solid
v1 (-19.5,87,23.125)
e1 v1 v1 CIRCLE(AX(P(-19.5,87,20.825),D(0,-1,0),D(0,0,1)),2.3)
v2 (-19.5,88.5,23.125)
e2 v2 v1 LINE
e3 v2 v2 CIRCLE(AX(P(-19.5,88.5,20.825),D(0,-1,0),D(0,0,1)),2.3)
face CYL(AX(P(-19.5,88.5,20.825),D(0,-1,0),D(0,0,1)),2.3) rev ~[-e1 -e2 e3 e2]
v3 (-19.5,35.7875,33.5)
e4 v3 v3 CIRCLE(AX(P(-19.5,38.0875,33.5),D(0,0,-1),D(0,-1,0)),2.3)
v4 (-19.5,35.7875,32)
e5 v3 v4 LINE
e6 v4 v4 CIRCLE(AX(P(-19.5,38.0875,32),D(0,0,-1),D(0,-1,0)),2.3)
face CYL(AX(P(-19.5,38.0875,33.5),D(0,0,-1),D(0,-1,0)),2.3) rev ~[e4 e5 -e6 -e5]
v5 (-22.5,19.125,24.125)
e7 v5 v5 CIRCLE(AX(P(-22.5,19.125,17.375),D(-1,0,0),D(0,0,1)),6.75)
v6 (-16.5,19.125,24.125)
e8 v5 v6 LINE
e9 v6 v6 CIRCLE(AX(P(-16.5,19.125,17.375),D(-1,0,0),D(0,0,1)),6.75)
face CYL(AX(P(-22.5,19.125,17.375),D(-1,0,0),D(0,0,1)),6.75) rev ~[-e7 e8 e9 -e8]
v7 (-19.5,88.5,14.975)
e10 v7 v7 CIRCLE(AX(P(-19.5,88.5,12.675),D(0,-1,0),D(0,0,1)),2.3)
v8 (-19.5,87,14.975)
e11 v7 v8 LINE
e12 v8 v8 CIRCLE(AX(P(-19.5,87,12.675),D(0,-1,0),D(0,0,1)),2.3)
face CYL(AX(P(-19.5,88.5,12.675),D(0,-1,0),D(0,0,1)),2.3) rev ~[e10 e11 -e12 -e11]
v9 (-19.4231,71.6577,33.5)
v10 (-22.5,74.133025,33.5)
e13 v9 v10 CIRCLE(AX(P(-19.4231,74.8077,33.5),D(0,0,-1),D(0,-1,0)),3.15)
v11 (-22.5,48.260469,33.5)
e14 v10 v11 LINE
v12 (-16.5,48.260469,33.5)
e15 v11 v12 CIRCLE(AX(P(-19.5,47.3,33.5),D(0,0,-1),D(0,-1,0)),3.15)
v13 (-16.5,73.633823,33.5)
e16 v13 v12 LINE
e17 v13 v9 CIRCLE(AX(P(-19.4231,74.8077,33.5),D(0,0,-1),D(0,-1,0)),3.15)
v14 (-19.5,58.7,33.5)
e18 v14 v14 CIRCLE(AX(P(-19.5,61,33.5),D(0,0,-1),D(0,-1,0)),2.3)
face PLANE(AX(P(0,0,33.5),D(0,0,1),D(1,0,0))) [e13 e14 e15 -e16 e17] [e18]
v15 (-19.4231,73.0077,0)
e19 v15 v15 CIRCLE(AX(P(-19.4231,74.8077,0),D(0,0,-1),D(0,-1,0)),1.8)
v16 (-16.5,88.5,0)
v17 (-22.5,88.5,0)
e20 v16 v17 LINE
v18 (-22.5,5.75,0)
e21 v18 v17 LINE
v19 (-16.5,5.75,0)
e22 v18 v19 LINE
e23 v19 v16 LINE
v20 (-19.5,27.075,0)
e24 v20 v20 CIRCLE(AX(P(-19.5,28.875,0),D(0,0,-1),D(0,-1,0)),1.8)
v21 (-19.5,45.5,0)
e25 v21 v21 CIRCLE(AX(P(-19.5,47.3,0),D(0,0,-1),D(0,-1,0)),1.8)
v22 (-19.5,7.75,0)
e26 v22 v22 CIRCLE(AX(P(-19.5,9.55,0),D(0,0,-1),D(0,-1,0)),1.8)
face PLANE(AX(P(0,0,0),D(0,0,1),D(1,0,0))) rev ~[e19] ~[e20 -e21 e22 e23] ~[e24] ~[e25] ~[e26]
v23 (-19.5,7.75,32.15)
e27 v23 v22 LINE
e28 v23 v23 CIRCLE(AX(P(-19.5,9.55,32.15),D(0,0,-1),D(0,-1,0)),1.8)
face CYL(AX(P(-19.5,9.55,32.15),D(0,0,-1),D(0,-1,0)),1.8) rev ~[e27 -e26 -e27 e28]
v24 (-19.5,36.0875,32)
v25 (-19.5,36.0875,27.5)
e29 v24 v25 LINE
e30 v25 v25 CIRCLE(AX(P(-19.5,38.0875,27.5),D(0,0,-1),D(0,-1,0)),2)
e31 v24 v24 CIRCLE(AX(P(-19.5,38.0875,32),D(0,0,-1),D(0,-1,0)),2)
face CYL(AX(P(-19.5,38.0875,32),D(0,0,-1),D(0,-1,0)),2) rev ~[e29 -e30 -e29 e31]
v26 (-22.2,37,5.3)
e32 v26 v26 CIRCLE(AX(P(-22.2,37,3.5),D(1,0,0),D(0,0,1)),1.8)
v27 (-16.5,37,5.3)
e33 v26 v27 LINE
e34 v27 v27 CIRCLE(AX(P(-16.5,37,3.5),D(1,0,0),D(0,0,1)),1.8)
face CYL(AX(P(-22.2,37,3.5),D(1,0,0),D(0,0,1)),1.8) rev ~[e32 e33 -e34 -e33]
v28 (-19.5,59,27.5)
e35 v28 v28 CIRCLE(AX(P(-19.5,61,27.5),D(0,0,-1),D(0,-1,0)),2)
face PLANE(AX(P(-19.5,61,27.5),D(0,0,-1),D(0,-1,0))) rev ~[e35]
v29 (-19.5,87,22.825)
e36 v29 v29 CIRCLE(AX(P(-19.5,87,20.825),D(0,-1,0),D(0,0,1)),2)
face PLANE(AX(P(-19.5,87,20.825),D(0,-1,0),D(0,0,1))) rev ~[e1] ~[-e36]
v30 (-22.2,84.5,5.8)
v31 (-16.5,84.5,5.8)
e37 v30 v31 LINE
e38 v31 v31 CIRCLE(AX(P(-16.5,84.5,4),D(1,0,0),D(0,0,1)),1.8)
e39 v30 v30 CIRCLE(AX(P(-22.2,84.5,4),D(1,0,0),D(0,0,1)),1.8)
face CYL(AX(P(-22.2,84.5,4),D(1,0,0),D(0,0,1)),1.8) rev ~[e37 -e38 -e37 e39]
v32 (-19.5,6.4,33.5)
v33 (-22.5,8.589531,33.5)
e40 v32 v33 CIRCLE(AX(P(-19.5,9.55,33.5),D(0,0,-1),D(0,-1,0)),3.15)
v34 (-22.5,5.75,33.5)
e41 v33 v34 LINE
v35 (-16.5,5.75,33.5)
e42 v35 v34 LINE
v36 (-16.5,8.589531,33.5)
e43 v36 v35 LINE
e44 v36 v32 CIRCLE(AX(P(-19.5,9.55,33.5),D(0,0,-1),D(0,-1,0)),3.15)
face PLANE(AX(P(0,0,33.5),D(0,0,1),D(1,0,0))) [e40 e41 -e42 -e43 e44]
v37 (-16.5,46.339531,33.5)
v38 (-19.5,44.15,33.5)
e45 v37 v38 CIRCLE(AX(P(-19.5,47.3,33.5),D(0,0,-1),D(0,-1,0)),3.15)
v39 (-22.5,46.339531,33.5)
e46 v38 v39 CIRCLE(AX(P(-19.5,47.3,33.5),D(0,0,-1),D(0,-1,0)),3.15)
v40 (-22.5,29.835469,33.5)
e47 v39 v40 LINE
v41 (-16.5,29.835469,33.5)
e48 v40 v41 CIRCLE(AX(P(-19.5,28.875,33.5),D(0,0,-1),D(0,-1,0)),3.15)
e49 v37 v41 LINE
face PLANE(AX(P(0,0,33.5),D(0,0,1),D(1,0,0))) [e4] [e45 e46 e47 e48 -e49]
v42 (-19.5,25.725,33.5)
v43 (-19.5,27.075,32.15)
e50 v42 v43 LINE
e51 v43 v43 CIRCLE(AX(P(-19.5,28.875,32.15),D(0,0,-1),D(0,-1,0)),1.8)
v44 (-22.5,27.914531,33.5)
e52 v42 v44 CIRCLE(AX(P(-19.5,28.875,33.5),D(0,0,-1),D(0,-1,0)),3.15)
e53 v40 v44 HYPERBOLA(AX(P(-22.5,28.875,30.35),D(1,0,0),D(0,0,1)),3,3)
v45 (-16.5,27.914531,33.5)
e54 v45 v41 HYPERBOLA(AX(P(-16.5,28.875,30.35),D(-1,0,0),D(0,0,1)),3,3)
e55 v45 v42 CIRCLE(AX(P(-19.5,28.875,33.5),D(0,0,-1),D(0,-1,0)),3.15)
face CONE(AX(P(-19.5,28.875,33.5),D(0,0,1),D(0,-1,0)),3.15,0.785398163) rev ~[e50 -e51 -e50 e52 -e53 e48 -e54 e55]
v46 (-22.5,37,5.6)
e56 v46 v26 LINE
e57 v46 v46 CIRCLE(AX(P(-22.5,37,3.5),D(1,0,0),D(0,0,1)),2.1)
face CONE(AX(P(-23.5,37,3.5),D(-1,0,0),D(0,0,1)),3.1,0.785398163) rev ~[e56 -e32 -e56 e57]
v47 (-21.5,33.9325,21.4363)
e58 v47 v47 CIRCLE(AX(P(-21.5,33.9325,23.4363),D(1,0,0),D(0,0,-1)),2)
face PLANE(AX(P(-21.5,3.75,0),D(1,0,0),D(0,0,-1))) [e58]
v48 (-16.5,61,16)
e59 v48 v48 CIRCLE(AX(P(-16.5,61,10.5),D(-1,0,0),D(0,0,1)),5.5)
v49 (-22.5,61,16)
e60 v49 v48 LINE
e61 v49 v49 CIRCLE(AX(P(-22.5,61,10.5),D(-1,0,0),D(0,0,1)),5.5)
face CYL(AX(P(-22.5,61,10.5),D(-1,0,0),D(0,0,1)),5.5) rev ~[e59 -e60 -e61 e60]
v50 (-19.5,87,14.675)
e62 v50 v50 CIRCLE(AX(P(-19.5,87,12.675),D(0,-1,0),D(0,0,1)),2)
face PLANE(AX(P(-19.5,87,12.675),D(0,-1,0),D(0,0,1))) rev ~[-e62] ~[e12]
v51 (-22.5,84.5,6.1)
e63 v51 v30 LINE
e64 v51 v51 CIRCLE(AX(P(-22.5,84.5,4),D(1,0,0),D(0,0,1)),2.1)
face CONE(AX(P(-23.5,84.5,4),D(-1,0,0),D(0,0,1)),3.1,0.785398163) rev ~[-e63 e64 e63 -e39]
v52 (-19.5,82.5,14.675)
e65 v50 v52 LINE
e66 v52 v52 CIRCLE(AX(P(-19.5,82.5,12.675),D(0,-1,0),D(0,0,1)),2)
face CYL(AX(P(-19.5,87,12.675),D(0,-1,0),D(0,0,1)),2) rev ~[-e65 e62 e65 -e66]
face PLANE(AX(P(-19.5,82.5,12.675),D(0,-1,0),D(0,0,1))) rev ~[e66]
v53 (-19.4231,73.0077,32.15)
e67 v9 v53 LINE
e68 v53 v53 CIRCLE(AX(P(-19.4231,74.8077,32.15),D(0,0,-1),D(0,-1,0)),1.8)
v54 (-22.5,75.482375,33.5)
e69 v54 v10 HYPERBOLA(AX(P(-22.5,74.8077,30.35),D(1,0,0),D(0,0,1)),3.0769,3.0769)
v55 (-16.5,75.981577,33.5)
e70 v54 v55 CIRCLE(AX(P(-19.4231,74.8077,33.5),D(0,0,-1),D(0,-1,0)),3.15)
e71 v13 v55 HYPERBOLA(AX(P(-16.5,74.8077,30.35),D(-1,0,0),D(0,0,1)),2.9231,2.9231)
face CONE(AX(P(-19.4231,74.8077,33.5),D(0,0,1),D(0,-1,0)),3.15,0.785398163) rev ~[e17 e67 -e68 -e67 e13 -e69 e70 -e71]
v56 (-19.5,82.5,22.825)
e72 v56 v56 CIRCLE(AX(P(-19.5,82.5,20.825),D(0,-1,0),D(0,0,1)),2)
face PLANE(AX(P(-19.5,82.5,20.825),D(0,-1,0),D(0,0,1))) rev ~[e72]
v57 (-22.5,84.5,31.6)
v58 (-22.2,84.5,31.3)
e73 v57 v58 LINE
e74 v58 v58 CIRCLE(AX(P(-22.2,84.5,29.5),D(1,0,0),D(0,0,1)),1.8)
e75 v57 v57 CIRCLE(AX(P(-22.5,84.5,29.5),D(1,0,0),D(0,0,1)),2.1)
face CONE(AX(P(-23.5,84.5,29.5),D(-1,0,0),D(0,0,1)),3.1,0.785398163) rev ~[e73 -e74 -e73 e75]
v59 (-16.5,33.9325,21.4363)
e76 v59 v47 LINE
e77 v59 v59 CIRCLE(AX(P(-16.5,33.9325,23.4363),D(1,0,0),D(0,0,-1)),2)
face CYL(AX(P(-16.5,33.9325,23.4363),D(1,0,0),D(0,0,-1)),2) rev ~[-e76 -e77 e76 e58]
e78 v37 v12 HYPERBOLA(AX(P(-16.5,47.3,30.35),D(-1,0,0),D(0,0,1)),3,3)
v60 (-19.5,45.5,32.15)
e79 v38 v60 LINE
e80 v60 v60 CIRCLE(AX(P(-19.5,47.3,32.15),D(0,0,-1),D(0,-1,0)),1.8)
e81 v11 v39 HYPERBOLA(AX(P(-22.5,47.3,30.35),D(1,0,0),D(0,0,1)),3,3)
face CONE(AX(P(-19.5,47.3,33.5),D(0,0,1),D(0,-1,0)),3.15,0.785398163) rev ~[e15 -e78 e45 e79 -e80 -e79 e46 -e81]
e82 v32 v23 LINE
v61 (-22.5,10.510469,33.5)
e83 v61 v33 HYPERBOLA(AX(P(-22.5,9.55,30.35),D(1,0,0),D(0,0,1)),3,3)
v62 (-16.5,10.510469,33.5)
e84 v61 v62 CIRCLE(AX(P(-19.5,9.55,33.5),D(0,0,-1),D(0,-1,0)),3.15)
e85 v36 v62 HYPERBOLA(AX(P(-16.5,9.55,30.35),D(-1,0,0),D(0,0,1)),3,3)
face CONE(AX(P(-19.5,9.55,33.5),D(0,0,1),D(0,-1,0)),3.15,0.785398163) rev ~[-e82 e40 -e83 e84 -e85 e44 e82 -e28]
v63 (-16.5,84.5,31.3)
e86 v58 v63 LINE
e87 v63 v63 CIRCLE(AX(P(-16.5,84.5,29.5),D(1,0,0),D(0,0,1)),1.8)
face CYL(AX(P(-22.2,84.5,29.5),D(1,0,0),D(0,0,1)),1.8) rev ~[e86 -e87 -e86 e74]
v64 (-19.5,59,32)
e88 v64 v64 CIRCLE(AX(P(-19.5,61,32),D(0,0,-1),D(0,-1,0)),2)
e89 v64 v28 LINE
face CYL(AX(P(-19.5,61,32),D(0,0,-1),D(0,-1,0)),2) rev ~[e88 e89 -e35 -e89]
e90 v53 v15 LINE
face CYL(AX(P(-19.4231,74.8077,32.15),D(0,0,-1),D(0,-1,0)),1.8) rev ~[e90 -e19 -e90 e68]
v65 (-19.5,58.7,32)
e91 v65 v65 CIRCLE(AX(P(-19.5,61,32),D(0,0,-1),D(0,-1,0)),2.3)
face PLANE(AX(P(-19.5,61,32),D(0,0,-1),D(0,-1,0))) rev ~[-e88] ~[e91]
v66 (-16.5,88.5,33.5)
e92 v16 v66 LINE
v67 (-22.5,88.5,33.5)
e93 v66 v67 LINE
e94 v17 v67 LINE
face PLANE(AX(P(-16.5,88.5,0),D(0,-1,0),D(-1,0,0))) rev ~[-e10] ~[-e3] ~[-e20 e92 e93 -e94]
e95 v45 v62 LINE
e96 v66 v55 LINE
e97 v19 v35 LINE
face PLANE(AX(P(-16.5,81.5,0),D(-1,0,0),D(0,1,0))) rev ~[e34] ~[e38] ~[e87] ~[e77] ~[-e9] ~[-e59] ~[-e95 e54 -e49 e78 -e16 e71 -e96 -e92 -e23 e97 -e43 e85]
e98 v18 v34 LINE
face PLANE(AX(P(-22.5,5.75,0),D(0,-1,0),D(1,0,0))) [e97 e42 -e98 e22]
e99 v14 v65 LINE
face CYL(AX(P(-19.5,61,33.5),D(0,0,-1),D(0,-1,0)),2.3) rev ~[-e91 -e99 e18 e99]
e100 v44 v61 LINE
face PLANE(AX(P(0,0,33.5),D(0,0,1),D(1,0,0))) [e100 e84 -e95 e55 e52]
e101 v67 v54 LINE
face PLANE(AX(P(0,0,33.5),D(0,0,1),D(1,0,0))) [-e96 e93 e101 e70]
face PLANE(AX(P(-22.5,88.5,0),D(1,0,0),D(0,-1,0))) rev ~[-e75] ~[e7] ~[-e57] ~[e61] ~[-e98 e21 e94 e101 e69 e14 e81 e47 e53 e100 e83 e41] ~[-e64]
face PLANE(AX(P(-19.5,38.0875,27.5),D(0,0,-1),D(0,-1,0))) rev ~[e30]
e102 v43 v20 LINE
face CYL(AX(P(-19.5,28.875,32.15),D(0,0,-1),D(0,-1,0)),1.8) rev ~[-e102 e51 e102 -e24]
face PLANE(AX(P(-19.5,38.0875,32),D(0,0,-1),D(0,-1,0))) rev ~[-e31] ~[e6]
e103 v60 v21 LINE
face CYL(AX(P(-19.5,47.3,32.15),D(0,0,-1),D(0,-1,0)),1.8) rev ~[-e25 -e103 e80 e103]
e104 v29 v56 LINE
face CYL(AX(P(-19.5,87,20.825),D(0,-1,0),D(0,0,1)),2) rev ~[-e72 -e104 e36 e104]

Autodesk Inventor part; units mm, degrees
ref_plane "YZ Plane" through (0, 0, 0) normal (1, 0, 0) x (0, 1, 0)
ref_plane "XZ Plane" through (0, 0, 0) normal (0, 1, 0) x (-1, 0, 0)
ref_plane "Work Plane1" through (0, 0, 0) normal (0, 0, 1) x (1, 0, 0)
sketch "Sketch1" plane through (0, 0, 0) normal (0, 0, 1) x (1, 0, 0)
  line L0 (23.5, 88.5) -> (-23.5, 88.5) projected
  line L1 (-23.5, 88.5) -> (-23.5, 36.5) projected
  line L2 (-26.5, 33.5) -> (-89, 33.5) projected
  line L3 (-89, 33.5) -> (-89, -72.5) projected
  line L4 (-89, -72.5) -> (-77, -72.5) projected
  line L5 (-74, -75.5) -> (-74, -93.5) projected
  line L6 (-74, -93.5) -> (74, -93.5) projected
  line L7 (74, -93.5) -> (74, -75.5) projected
  line L8 (77, -72.5) -> (89, -72.5) projected
  line L9 (89, -72.5) -> (89, 33.5) projected
  line L10 (89, 33.5) -> (26.5, 33.5) projected
  line L11 (23.5, 36.5) -> (23.5, 88.5) projected
  line L12 (-4.5, 81.5) -> (-4.5, 36.5) projected
  line L13 (-7.5, 33.5) -> (-13.5, 33.5) projected
  line L14 (-16.5, 36.5) -> (-16.5, 81.5) projected
  line L15 (-13.5, 84.5) -> (-7.5, 84.5) projected
  line L16 (16.5, 81.5) -> (16.5, 36.5) projected
  line L17 (13.5, 33.5) -> (7.5, 33.5) projected
  line L18 (4.5, 36.5) -> (4.5, 81.5) projected
  line L19 (7.5, 84.5) -> (13.5, 84.5) projected
  line L20 (-16.5, 88.5) -> (-22.5, 88.5)
  line L21 (-22.5, 88.5) -> (-22.5, 3.75)
  line L22 (-22.5, 3.75) -> (-16.5, 3.75)
  line L23 (-16.5, 3.75) -> (-16.5, 88.5)
  line L24 (-32.2, 4.75) -> (-59.9, 4.75)
  arc A0 (13.5, 33.5) -> (16.5, 36.5) centre (13.5, 36.5) ccw projected
  arc A1 (4.5, 36.5) -> (7.5, 33.5) centre (7.5, 36.5) ccw projected
  arc A2 (7.5, 84.5) -> (4.5, 81.5) centre (7.5, 81.5) ccw projected
  arc A3 (16.5, 81.5) -> (13.5, 84.5) centre (13.5, 81.5) ccw projected
  arc A4 (-4.5, 81.5) -> (-7.5, 84.5) centre (-7.5, 81.5) ccw projected
  arc A5 (-7.5, 33.5) -> (-4.5, 36.5) centre (-7.5, 36.5) ccw projected
  arc A6 (-16.5, 36.5) -> (-13.5, 33.5) centre (-13.5, 36.5) ccw projected
  arc A7 (-13.5, 84.5) -> (-16.5, 81.5) centre (-13.5, 81.5) ccw projected
  arc A8 (-26.5, 33.5) -> (-23.5, 36.5) centre (-26.5, 36.5) ccw projected
  arc A9 (-74, -75.5) -> (-77, -72.5) centre (-77, -75.5) ccw projected
  arc A10 (77, -72.5) -> (74, -75.5) centre (77, -75.5) ccw projected
  arc A11 (23.5, 36.5) -> (26.5, 33.5) centre (26.5, 36.5) ccw projected
  circle A12 centre (39.125, 25.9125) radius 1.0065 projected
  circle A13 centre (72.95, 12.275) radius 1.0065 projected
  circle A14 centre (-39.125, 12.3375) radius 1.0065 projected
  circle A15 centre (-72.95, 25.975) radius 1.0065 projected
  circle A16 centre (-72.95, 12.275) radius 1.0065 projected
  circle A17 centre (-39.125, 25.9125) radius 1.0065 projected
  circle A18 centre (72.95, 25.975) radius 1.0065 projected
  circle A19 centre (39.125, 12.3375) radius 1.0065 projected
  circle A20 centre (-42.4984, -44.6666) radius 1.2295 projected
  circle A21 centre (-79, -42.3889) radius 1.2295 projected
  circle A22 centre (-19.5, 28.875) radius 1.2295 projected
  circle A23 centre (19.5, 9.55) radius 1.2295 projected
  circle A24 centre (19.5, 47.3) radius 1.2295 projected
  circle A25 centre (-19.5, 47.3) radius 1.2295 projected
  circle A26 centre (0, 74.7) radius 1.2295 projected
  circle A27 centre (-19.4231, 74.8077) radius 1.2295 projected
  circle A28 centre (19.5, 74.7) radius 1.2295 projected
  circle A29 centre (0, 49.05) radius 1.2295 projected
  circle A30 centre (19.5, 28.875) radius 1.2295 projected
  circle A31 centre (0, 19.125) radius 1.2295 projected
  circle A32 centre (-19.5, 9.55) radius 1.2295 projected
  circle A33 centre (42.5, -44.6649) radius 1.2295 projected
  circle A34 centre (79, -42.3889) radius 1.2295 projected
  circle A35 centre (21.5, -85.5) radius 1.8 projected
  circle A36 centre (-64.5, -85.5) radius 1.8 projected
  circle A37 centre (-21.5, -85.5) radius 1.8 projected
  circle A38 centre (64.5, -85.5) radius 1.8 projected
  line L25 (-58.2315, -77.6013) -> (-80.7685, -61.1541) projected
  line L26 (-82, -58.7308) -> (-82, -48.3889) projected
  line L27 (-75.8885, -45.3972) -> (-47.1423, -47.5438) projected
  line L28 (-21.1, -26.5751) -> (-21.1, -22.0813) projected
  line L29 (-46.9357, -41.5592) -> (-76, -39.3889) projected
  line L30 (-82, -36.3889) -> (-82, 1.75) projected
  line L31 (32.9914, 4.75) -> (79, 4.75) projected
  line L32 (82, -48.3889) -> (82, -58.7308) projected
  line L33 (76, -39.3889) -> (46.9371, -41.5577) projected
  line L34 (21.1, -22.0813) -> (21.1, -26.5749) projected
  line L35 (47.144, -47.5423) -> (76, -45.3889) projected
  line L36 (82, 1.75) -> (82, -36.3889) projected
  line L37 (80.7685, -61.1541) -> (58.2315, -77.6013) projected
  line L38 (57, -80.0246) -> (57, -87.5) projected
  arc A39 (55, -89.5) -> (57, -87.5) centre (55, -87.5) ccw projected
  line L39 (55, -89.5) -> (31, -89.5) projected
  arc A40 (29, -87.5) -> (31, -89.5) centre (31, -87.5) ccw projected
  line L40 (29, -87.5) -> (29, -79.2522) projected
  line L41 (14, -79.5039) -> (14, -87.5) projected
  arc A41 (12, -89.5) -> (14, -87.5) centre (12, -87.5) ccw projected
  line L42 (12, -89.5) -> (-12, -89.5) projected
  arc A42 (-14, -87.5) -> (-12, -89.5) centre (-12, -87.5) ccw projected
  line L43 (-14, -87.5) -> (-14, -79.5039) projected
  line L44 (-29, -79.2522) -> (-29, -87.5) projected
  arc A43 (-31, -89.5) -> (-29, -87.5) centre (-31, -87.5) ccw projected
  line L45 (-31, -89.5) -> (-55, -89.5) projected
  arc A44 (-57, -87.5) -> (-55, -89.5) centre (-55, -87.5) ccw projected
  line L46 (-57, -87.5) -> (-57, -80.0246) projected
  line L47 (-66.95, 28.9125) -> (-45.125, 28.9125) projected
  line L48 (-42.125, 25.9125) -> (-42.125, 12.275) projected
  line L49 (-45.125, 9.275) -> (-66.95, 9.275) projected
  line L50 (-69.95, 12.275) -> (-69.95, 25.9125) projected
  line L51 (-16.5, 12.75) -> (-16.5, 25.5) projected
  line L52 (-13.5, 28.5) -> (-7.5, 28.5) projected
  line L53 (-4.5, 25.5) -> (-4.5, 12.75) projected
  line L54 (-7.5, 9.75) -> (-13.5, 9.75) projected
  line L55 (66.95, 9.3375) -> (45.125, 9.3375) projected
  line L56 (42.125, 12.3375) -> (42.125, 25.975) projected
  line L57 (45.125, 28.975) -> (66.95, 28.975) projected
  line L58 (69.95, 25.975) -> (69.95, 12.3375) projected
  line L59 (4.5, 12.75) -> (4.5, 25.5) projected
  line L60 (7.5, 28.5) -> (13.5, 28.5) projected
  line L61 (16.5, 25.5) -> (16.5, 12.75) projected
  line L62 (13.5, 9.75) -> (7.5, 9.75) projected
  line L63 (44.5181, -40.6102) -> (28.0504, -22.9209) projected
  line L64 (27.268, -20.5154) -> (30.0132, 2.1113) projected
  line L65 (-44.7206, -49.1201) -> (-29.3549, -77.8368) projected
  line L66 (-79, 4.75) -> (-32.9914, 4.75) projected
  line L67 (-30.0132, 2.1113) -> (-27.268, -20.5155) projected
  line L68 (-28.0502, -22.9208) -> (-44.5164, -40.6115) projected
  line L69 (29.3549, -77.8368) -> (44.7222, -49.1185) projected
  line L70 (-14.6042, -77.6983) -> (-37.8537, -46.8489) projected
  line L71 (-37.4786, -42.8259) -> (-22.0793, -28.7924) projected
  line L72 (-21.1218, -21.72) -> (-23.9255, 1.3887) projected
  line L73 (-20.9474, 4.75) -> (20.9474, 4.75) projected
  line L74 (23.9255, 1.3887) -> (21.1218, -21.72) projected
  line L75 (22.0795, -28.7925) -> (37.4798, -42.8243) projected
  line L76 (37.8551, -46.8475) -> (14.6042, -77.6983) projected
  circle A45 centre (-78, -67.1725) radius 1.2295 projected
  arc A46 (79, -39.3889) -> (82, -36.3889) centre (79, -36.3889) ccw projected
  arc A47 (44.5181, -40.6102) -> (46.9371, -41.5577) centre (46.7138, -38.566) ccw projected
  arc A48 (27.268, -20.5154) -> (28.0504, -22.9209) centre (30.2461, -20.8767) ccw projected
  arc A49 (32.9914, 4.75) -> (30.0132, 2.1113) centre (32.9914, 1.75) ccw projected
  arc A50 (82, 1.75) -> (79, 4.75) centre (79, 1.75) ccw projected
  arc A51 (-42.125, 25.9125) -> (-45.125, 28.9125) centre (-45.125, 25.9125) ccw projected
  arc A52 (-45.125, 9.275) -> (-42.125, 12.275) centre (-45.125, 12.275) ccw projected
  arc A53 (-69.95, 12.275) -> (-66.95, 9.275) centre (-66.95, 12.275) ccw projected
  arc A54 (-66.95, 28.9125) -> (-69.95, 25.9125) centre (-66.95, 25.9125) ccw projected
  arc A55 (-13.5, 28.5) -> (-16.5, 25.5) centre (-13.5, 25.5) ccw projected
  arc A56 (-4.5, 25.5) -> (-7.5, 28.5) centre (-7.5, 25.5) ccw projected
  arc A57 (-7.5, 9.75) -> (-4.5, 12.75) centre (-7.5, 12.75) ccw projected
  arc A58 (-16.5, 12.75) -> (-13.5, 9.75) centre (-13.5, 12.75) ccw projected
  arc A59 (58.2315, -77.6013) -> (57, -80.0246) centre (60, -80.0246) ccw projected
  arc A60 (29.3549, -77.8368) -> (29, -79.2522) centre (32, -79.2522) ccw projected
  arc A61 (47.144, -47.5423) -> (44.7222, -49.1185) centre (47.3673, -50.5339) ccw projected
  arc A62 (82, -48.3889) -> (79, -45.3889) centre (79, -48.3889) ccw projected
  arc A63 (80.7685, -61.1541) -> (82, -58.7308) centre (79, -58.7308) ccw projected
  arc A64 (-21.1, -22.0813) -> (-21.1218, -21.72) centre (-24.1, -22.0813) ccw projected
  arc A65 (-20.9474, 4.75) -> (-23.9255, 1.3887) centre (-20.9474, 1.75) ccw projected
  arc A66 (23.9255, 1.3887) -> (20.9474, 4.75) centre (20.9474, 1.75) ccw projected
  arc A67 (21.1218, -21.72) -> (21.1, -22.0813) centre (24.1, -22.0813) ccw projected
  arc A68 (21.1, -26.5749) -> (22.0795, -28.7925) centre (24.1, -26.5749) ccw projected
  arc A69 (37.8551, -46.8475) -> (37.4798, -42.8243) centre (35.4593, -45.0419) ccw projected
  arc A70 (14.6042, -77.6983) -> (14, -79.5039) centre (17, -79.5039) ccw projected
  arc A71 (-14, -79.5039) -> (-14.6042, -77.6983) centre (-17, -79.5039) ccw projected
  arc A72 (-37.4786, -42.8259) -> (-37.8537, -46.8489) centre (-35.4579, -45.0433) ccw projected
  arc A73 (-22.0793, -28.7924) -> (-21.1, -26.5751) centre (-24.1, -26.5751) ccw projected
  arc A74 (-82, -36.3889) -> (-79, -39.3889) centre (-79, -36.3889) ccw projected
  arc A75 (-79, 4.75) -> (-82, 1.75) centre (-79, 1.75) ccw projected
  arc A76 (-30.0132, 2.1113) -> (-32.9914, 4.75) centre (-32.9914, 1.75) ccw projected
  arc A77 (-28.0502, -22.9208) -> (-27.268, -20.5155) centre (-30.2461, -20.8769) ccw projected
  arc A78 (-46.9357, -41.5592) -> (-44.5164, -40.6115) centre (-46.7123, -38.5676) ccw projected
  arc A79 (7.5, 28.5) -> (4.5, 25.5) centre (7.5, 25.5) ccw projected
  arc A80 (16.5, 25.5) -> (13.5, 28.5) centre (13.5, 25.5) ccw projected
  arc A81 (13.5, 9.75) -> (16.5, 12.75) centre (13.5, 12.75) ccw projected
  arc A82 (4.5, 12.75) -> (7.5, 9.75) centre (7.5, 12.75) ccw projected
  arc A83 (-57, -80.0246) -> (-58.2315, -77.6013) centre (-60, -80.0246) ccw projected
  arc A84 (-82, -58.7308) -> (-80.7685, -61.1541) centre (-79, -58.7308) ccw projected
  arc A85 (-75.8885, -45.3972) -> (-76.1119, -45.3889) centre (-76.1119, -48.3889) ccw projected
  arc A86 (-44.7206, -49.1201) -> (-47.1423, -47.5438) centre (-47.3657, -50.5355) ccw projected
  arc A87 (-29, -79.2522) -> (-29.3549, -77.8368) centre (-32, -79.2522) ccw projected
  arc A88 (42.125, 12.3375) -> (45.125, 9.3375) centre (45.125, 12.3375) ccw projected
  arc A89 (45.125, 28.975) -> (42.125, 25.975) centre (45.125, 25.975) ccw projected
  arc A90 (69.95, 25.975) -> (66.95, 28.975) centre (66.95, 25.975) ccw projected
  arc A91 (66.95, 9.3375) -> (69.95, 12.3375) centre (66.95, 12.3375) ccw projected
  circle A92 centre (78, -67.1725) radius 1.2295 projected
  line L77 (-22.5, 25.9125) -> (-22.5, 12.55) projected
  arc A93 (-25.5, 9.55) -> (-22.5, 12.55) centre (-25.5, 12.55) ccw projected
  line L78 (-25.5, 9.55) -> (-33.125, 9.55) projected
  arc A94 (-36.125, 12.55) -> (-33.125, 9.55) centre (-33.125, 12.55) ccw projected
  line L79 (-36.125, 12.55) -> (-36.125, 25.9125) projected
  arc A95 (-33.125, 28.9125) -> (-36.125, 25.9125) centre (-33.125, 25.9125) ccw projected
  line L80 (-33.125, 28.9125) -> (-25.5, 28.9125) projected
  arc A96 (-22.5, 25.9125) -> (-25.5, 28.9125) centre (-25.5, 25.9125) ccw projected
  line L81 (76, -45.3889) -> (79, -45.3889) projected
  line L82 (79, -39.3889) -> (76, -39.3889) projected
  line L83 (33.125, 9.275) -> (25.5, 9.275) projected
  arc A97 (22.5, 12.275) -> (25.5, 9.275) centre (25.5, 12.275) ccw projected
  line L84 (22.5, 12.275) -> (22.5, 25.9125) projected
  arc A98 (25.5, 28.9125) -> (22.5, 25.9125) centre (25.5, 25.9125) ccw projected
  line L85 (25.5, 28.9125) -> (33.125, 28.9125) projected
  arc A99 (36.125, 25.9125) -> (33.125, 28.9125) centre (33.125, 25.9125) ccw projected
  line L86 (36.125, 25.9125) -> (36.125, 12.275) projected
  arc A100 (33.125, 9.275) -> (36.125, 12.275) centre (33.125, 12.275) ccw projected
  line L87 (-83, 28.975) -> (-78.95, 28.975) projected
  arc A101 (-75.95, 25.975) -> (-78.95, 28.975) centre (-78.95, 25.975) ccw projected
  line L88 (-75.95, 25.975) -> (-75.95, 12.275) projected
  arc A102 (-78.95, 9.275) -> (-75.95, 12.275) centre (-78.95, 12.275) ccw projected
  line L89 (-78.95, 9.275) -> (-83, 9.275) projected
  arc A103 (-86, 12.275) -> (-83, 9.275) centre (-83, 12.275) ccw projected
  line L90 (-86, 12.275) -> (-86, 25.975) projected
  arc A104 (-83, 28.975) -> (-86, 25.975) centre (-83, 25.975) ccw projected
  arc A105 (-79, -45.3889) -> (-82, -48.3889) centre (-79, -48.3889) ccw projected
  line L91 (-79, -45.3889) -> (-76.1119, -45.3889) projected
  line L92 (-76, -39.3889) -> (-79, -39.3889) projected
  line L93 (78.95, 28.975) -> (83, 28.975) projected
  arc A106 (86, 25.975) -> (83, 28.975) centre (83, 25.975) ccw projected
  line L94 (86, 25.975) -> (86, 12.275) projected
  arc A107 (83, 9.275) -> (86, 12.275) centre (83, 12.275) ccw projected
  line L95 (83, 9.275) -> (78.95, 9.275) projected
  arc A108 (75.95, 12.275) -> (78.95, 9.275) centre (78.95, 12.275) ccw projected
  line L96 (75.95, 12.275) -> (75.95, 25.975) projected
  arc A109 (78.95, 28.975) -> (75.95, 25.975) centre (78.95, 25.975) ccw projected
  circle A110 centre (-24.1, -73.1) radius 1.2295 projected
  circle A111 centre (24.1, -24.9) radius 1.2295 projected
  circle A112 centre (-24.1, -24.9) radius 1.2295 projected
  circle A113 centre (24.1, -73.1) radius 1.2295 projected
  point P0 (0, 0)
  point P1 (-16.5, 36.5)
  point P2 (-16.5, 81.5)
  point P3 (7.5, 81.5)
  point P4 (13.5, 81.5)
  point P5 (-7.5, 81.5)
  point P6 (-13.5, 81.5)
  point P7 (-77, -75.5)
  point P8 (39, -44.2094)
  point P9 (-16.5, 9.75)
  point P10 (-16.5, 28.5)
  point P11 (-79, -67.8878)
  point P12 (-79, -66.4572)
  point P13 (7.5, 81.5)
  point P14 (13.5, 81.5)
  point P15 (-7.5, 81.5)
  point P16 (-13.5, 81.5)
  dimension "d0" = 1
  dimension "d2" = 1
ref_plane "Work Plane2" through (-89, -40.3889, 33.5) normal (0, 0, 1) x (1, 0, 0)
extrude "Extrusion1" add sketch "Sketch1" along normal up to surface (33.5 mm away) contours L23 L14 L73 A65 L21 L0 | A65 L73 L23 L22 L21 | A22 | A25 | A27 | A32
sketch "Sketch2" plane through (-22.5, 3.75, 0) normal (-1, 0, 0) x (0, 0, 1)
  arc A0 (15.7043, 9.7757) -> (16.863, 11.545) centre (12.3771, 13.2188) ccw projected
  arc A1 (16.863, 11.545) -> (17.4685, 11.512) centre (17.375, 15.375) ccw projected
  arc A2 (17.4685, 11.512) -> (18.4285, 9.6275) centre (22.1095, 12.6893) ccw projected
  arc A3 (18.4285, 9.6275) -> (19.3146, 9.863) centre (17.375, 15.375) ccw projected
  arc A4 (19.3146, 9.863) -> (19.2121, 11.9755) centre (14.599, 10.6929) ccw projected
  arc A5 (19.2121, 11.9755) -> (19.7212, 12.3047) centre (17.375, 15.375) ccw projected
  arc A6 (19.7212, 12.3047) -> (21.6056, 11.3444) centre (22.7839, 15.9851) ccw projected
  arc A7 (21.6056, 11.3444) -> (22.184, 12.0558) centre (17.375, 15.375) ccw projected
  arc A8 (22.184, 12.0558) -> (20.8594, 13.7045) centre (17.8813, 9.9554) ccw projected
  arc A9 (20.8594, 13.7045) -> (21.0778, 14.2702) centre (17.375, 15.375) ccw projected
  arc A10 (21.0778, 14.2702) -> (23.1668, 14.6008) centre (21.3923, 19.0479) ccw projected
  arc A11 (23.1668, 14.6008) -> (23.2166, 15.5164) centre (17.375, 15.375) ccw projected
  arc A12 (23.2166, 15.5164) -> (21.1758, 16.0716) centre (20.9701, 11.288) ccw projected
  arc A13 (21.1758, 16.0716) -> (21.02, 16.6576) centre (17.375, 15.375) ccw projected
  arc A14 (21.02, 16.6576) -> (22.5157, 18.153) centre (18.4662, 20.7077) ccw projected
  arc A15 (22.5157, 18.153) -> (22.0178, 18.923) centre (17.375, 15.375) ccw projected
  arc A16 (22.0178, 18.923) -> (20.0404, 18.1726) centre (22.6858, 14.1817) ccw projected
  arc A17 (20.0404, 18.1726) -> (19.57, 18.5552) centre (17.375, 15.375) ccw projected
  arc A18 (19.57, 18.5552) -> (19.9011, 20.644) centre (15.1233, 20.3306) ccw projected
  arc A19 (19.9011, 20.644) -> (19.0457, 20.9743) centre (17.375, 15.375) ccw projected
  arc A20 (19.0457, 20.9743) -> (17.887, 19.205) centre (22.3729, 17.5312) ccw projected
  arc A21 (17.887, 19.205) -> (17.2815, 19.238) centre (17.375, 15.375) ccw projected
  arc A22 (17.2815, 19.238) -> (16.3215, 21.1225) centre (12.6405, 18.0607) ccw projected
  arc A23 (16.3215, 21.1225) -> (15.4354, 20.887) centre (17.375, 15.375) ccw projected
  arc A24 (15.4354, 20.887) -> (15.5379, 18.7745) centre (20.151, 20.0571) ccw projected
  arc A25 (15.5379, 18.7745) -> (15.0288, 18.4453) centre (17.375, 15.375) ccw projected
  arc A26 (15.0288, 18.4453) -> (13.1444, 19.4056) centre (11.9661, 14.7649) ccw projected
  arc A27 (13.1444, 19.4056) -> (12.566, 18.6942) centre (17.375, 15.375) ccw projected
  arc A28 (12.566, 18.6942) -> (13.8906, 17.0455) centre (16.8687, 20.7946) ccw projected
  arc A29 (13.8906, 17.0455) -> (13.6722, 16.4798) centre (17.375, 15.375) ccw projected
  arc A30 (13.6722, 16.4798) -> (11.5832, 16.1492) centre (13.3577, 11.7021) ccw projected
  arc A31 (11.5832, 16.1492) -> (11.5334, 15.2336) centre (17.375, 15.375) ccw projected
  arc A32 (11.5334, 15.2336) -> (13.5742, 14.6784) centre (13.7799, 19.462) ccw projected
  arc A33 (13.5742, 14.6784) -> (13.73, 14.0924) centre (17.375, 15.375) ccw projected
  arc A34 (13.73, 14.0924) -> (12.2343, 12.597) centre (16.2838, 10.0423) ccw projected
  arc A35 (12.2343, 12.597) -> (12.7322, 11.827) centre (17.375, 15.375) ccw projected
  arc A36 (12.7322, 11.827) -> (14.7096, 12.5774) centre (12.0642, 16.5683) ccw projected
  arc A37 (14.7096, 12.5774) -> (15.18, 12.1948) centre (17.375, 15.375) ccw projected
  arc A38 (15.18, 12.1948) -> (14.8489, 10.106) centre (19.6267, 10.4194) ccw projected
  arc A39 (14.8489, 10.106) -> (15.7043, 9.7757) centre (17.375, 15.375) ccw projected
  circle A40 centre (17.375, 15.375) radius 6.75
  circle A41 centre (17.375, 15.375) radius 5.8433
  line L0 (23.2183, 15.375) -> (24.125, 15.375)
  circle A42 centre (10.5, 57.25) radius 5.5 projected
  point P0 (0, -3.75)
  dimension "d6" = 13.5
  dimension "d5" = 0.9067
  dimension "d9" = 11
extrude "Extrusion2" cut sketch "Sketch2" against normal up to next contours A39 A38 A37 A36 A35 A34 A33 A32 A31 A30 A29 A28 A27 A26 A25 A24 A23 A22 A21 A20 A19 A18 A17 A16 A15 A14 A13 A12 A11 A10 A9 A8 A7 A6 A5 A4 A3 A2 A1 A0 | A0 A1 A2 A41 | A41 A36 A37 A38 | A4 A5 A6 A41 | A41 A32 A33 A34 | A8 A9 A10 A41 | A41 A28 A29 A30 | A41 A24 A25 A26 | A12 A13 A14 A41 | A41 A20 A21 A22 | A16 A17 A18 A41 | A40 | A42
sketch "Sketch3" plane through (-16.5, 3.75, 0) normal (1, 0, 0) x (0, 0, -1)
  circle A0 centre (-23.4363, 30.1825) radius 2 projected
  point P0 (0, -3.75)
extrude "Extrusion3" cut sketch "Sketch3" against normal blind 5
ref_plane "Work Plane3" through (-23.5, 3.75, 0) normal (-1, 0, 0) x (0, 0, 1)
sketch "Sketch5" plane through (-23.5, 3.75, 0) normal (-1, 0, 0) x (0, 0, 1)
  circle A0 centre (29.5, 80.75) radius 2.1 projected
  circle A1 centre (4, 80.75) radius 2.1 projected
  circle A2 centre (3.5, 33.25) radius 2.1 projected
  point P0 (0, -3.75)
hole "Hole1" at (-23.5, 84.5, 29.5) at (-23.5, 84.5, 4) at (-23.5, 37, 3.5) direction (1, 0, 0) diameter 3.6 end through all countersink diameter 6.2 countersink angle 90 clearance for "Countersunk Flat Head Screw ISO 2009/7046" size "M3" standard "ISO"
sketch "Sketch6" plane through (-22.5, 3.75, 33.5) normal (0, 0, 1) x (1, 0, 0)
  line L0 (0, 8.625) -> (0, 22.125) projected
  line L1 (1, 32.1825) -> (1, 28.1825) projected
  line L2 (0, 31.15) -> (0, 35.35) projected
  line L3 (0, 51.75) -> (0, 62.75) projected
  line L4 (0, 78.65) -> (0, 82.85) projected
  line L5 (0, 78.65) -> (0, 82.85) projected
  line L6 (6, 0) -> (0, 0) projected
  line L7 (6, 84.75) -> (6, 0) projected
  line L8 (0, 84.75) -> (6, 84.75) projected
  line L9 (0, 0) -> (0, 84.75) projected
  line L10 (6, 28.125) -> (0, 28.125)
  line L11 (0, 28.125) -> (0, 35.35)
  line L12 (0, 35.35) -> (6, 35.35)
  line L13 (6, 35.35) -> (6, 28.125)
  line L14 (0, 8.625) -> (6, 8.625) projected
  line L15 (6, 8.625) -> (0, 8.625)
  line L16 (0, 8.625) -> (0, 22.125)
  line L17 (0, 22.125) -> (6, 22.125)
  line L18 (6, 22.125) -> (6, 8.625)
  line L19 (6, 78.95) -> (0.3, 78.95) projected
  line L20 (6, 84.75) -> (0, 84.75) projected
  line L21 (6, 78.95) -> (0, 78.95)
  line L22 (0, 78.95) -> (0, 84.75)
  line L23 (0, 84.75) -> (6, 84.75)
  line L24 (6, 84.75) -> (6, 78.95)
  line L25 (0, 51.75) -> (6, 51.75) projected
  line L26 (0, 51.75) -> (0, 62.75) projected
  line L27 (6, 51.75) -> (0, 51.75)
  line L28 (0, 51.75) -> (0, 62.75)
  line L29 (0, 62.75) -> (6, 62.75)
  line L30 (6, 62.75) -> (6, 51.75)
  line L31 (6, 0) -> (0, 0)
  line L32 (0, 0) -> (0, 4)
  line L33 (0, 4) -> (6, 4)
  line L34 (6, 4) -> (6, 0)
  circle A0 centre (3, 5.8) radius 1.8
  line L35 (6, 22.125) -> (0, 28.125)
  line L36 (0, 22.125) -> (6, 28.125)
  line L37 (6, 35.35) -> (0, 51.75)
  line L38 (0, 35.35) -> (6, 51.75)
  line L39 (0.3, 82.55) -> (0.3, 78.95) projected
  line L40 (6, 62.75) -> (0.3, 78.95)
  line L41 (6, 82.55) -> (6, 78.95) projected
  line L42 (0.3, 78.95) -> (6, 78.95)
  line L43 (6, 78.95) -> (0, 62.75)
  point P0 (22.5, -3.75)
  point P1 (3, 25.125)
  point P2 (3.0769, 71.0577)
  point P3 (3, 43.55)
  dimension "d20" = 4
  dimension "d21" = 3.6
  dimension "d22" = 3
  dimension "d23" = 3
hole "Hole2" at (-19.5, 28.875, 33.5) at (-19.5, 9.55, 33.5) at (-19.4231, 74.8077, 33.5) at (-19.5, 47.3, 33.5) direction (0, 0, -1) diameter 3.6 end through all countersink diameter 6.3 countersink angle 90 clearance for "Countersunk Flat Head Screw ISO 2009/7046" size "M3" standard "ISO"
sketch "Sketch9" plane through (-22.5, 88.5, 0) normal (0, 1, 0) x (1, 0, 0)
  circle A0 centre (22.5, -20.825) radius 2.3 projected
  circle A1 centre (22.5, -12.675) radius 2.3 projected
  line L0 (18, -33.5) -> (27, -33.5) projected
  line L1 (27, 0) -> (27, -33.5) projected
  line L2 (27, 0) -> (18, 0) projected
  line L3 (18, 0) -> (18, -33.5) projected
  line L4 (22.5, -20.825) -> (0, -20.825)
  line L5 (0, -24.125) -> (0, -10.625) projected
  line L6 (22.5, -12.675) -> (0, -12.675)
  line L7 (6, 0) -> (6, -33.5) projected
  point P0 (22.5, 0)
  point P1 (3, -20.825)
  point P2 (3, -12.675)
  dimension "d45" = 3
  dimension "d46" = 3
  dimension "d47" = 3
  dimension "d48" = 3
hole "Hole5" at (-19.5, 88.5, 20.825) at (-19.5, 88.5, 12.675) direction (0, -1, 0) diameter 4 depth 6 counterbore diameter 4.6 counterbore depth 1.5
sketch "Sketch10" plane through (-19.5, 47.3, 33.5) normal (0, 0, 1) x (1, 0, 0)
  line L0 (-3, 8.2) -> (-3, 19.2) projected
  arc A0 (3, -17.4645) -> (-3, -17.4645) centre (0, -18.425) ccw projected
  arc A1 (-3, -0.9605) -> (3, -0.9605) centre (0, 0) ccw projected
  arc A2 (3, -17.4645) -> (-3, -17.4645) centre (0, -18.425) ccw projected
  line L1 (3, -0.9605) -> (3, -17.4645) projected
  arc A3 (-3, -0.9605) -> (3, -0.9605) centre (0, 0) ccw projected
  line L2 (-3, -17.4645) -> (-3, -0.9605) projected
  line L3 (3, 8.2) -> (-3, 8.2)
  line L4 (3, 19.2) -> (-3, 19.2)
  line L5 (-3, 19.2) -> (3, 8.2)
  line L6 (-3, 8.2) -> (3, 19.2)
  line L7 (3, -17.4645) -> (-3, -0.9605)
  line L8 (-3, -17.4645) -> (3, -0.9605)
  point P0 (19.5, -47.3)
  point P1 (0, -9.2125)
  point P2 (0, 13.7)
hole "Hole6" at (-19.5, 38.0875, 33.5) at (-19.5, 61, 33.5) direction (0, 0, -1) diameter 4 depth 6 counterbore diameter 4.6 counterbore depth 1.5
sketch "Sketch11" plane through (-22.5, 3.75, 0) normal (0, -1, 0) x (1, 0, 0)
  line L0 (6, 33.5) -> (0, 33.5) projected
  line L1 (0, 0) -> (0, 33.5) projected
  line L2 (0, 0) -> (6, 0) projected
  line L3 (6, 0) -> (6, 33.5) projected
  point P0 (22.5, 0)
extrude "Extrusion4" cut sketch "Sketch11" against normal blind 2
equation "\"d22\" = d23"
equation "\"d45\" = d46"
equation "\"d47\" = d48"
properties part number "right_gear_holder" material "Nylon 6/6"
